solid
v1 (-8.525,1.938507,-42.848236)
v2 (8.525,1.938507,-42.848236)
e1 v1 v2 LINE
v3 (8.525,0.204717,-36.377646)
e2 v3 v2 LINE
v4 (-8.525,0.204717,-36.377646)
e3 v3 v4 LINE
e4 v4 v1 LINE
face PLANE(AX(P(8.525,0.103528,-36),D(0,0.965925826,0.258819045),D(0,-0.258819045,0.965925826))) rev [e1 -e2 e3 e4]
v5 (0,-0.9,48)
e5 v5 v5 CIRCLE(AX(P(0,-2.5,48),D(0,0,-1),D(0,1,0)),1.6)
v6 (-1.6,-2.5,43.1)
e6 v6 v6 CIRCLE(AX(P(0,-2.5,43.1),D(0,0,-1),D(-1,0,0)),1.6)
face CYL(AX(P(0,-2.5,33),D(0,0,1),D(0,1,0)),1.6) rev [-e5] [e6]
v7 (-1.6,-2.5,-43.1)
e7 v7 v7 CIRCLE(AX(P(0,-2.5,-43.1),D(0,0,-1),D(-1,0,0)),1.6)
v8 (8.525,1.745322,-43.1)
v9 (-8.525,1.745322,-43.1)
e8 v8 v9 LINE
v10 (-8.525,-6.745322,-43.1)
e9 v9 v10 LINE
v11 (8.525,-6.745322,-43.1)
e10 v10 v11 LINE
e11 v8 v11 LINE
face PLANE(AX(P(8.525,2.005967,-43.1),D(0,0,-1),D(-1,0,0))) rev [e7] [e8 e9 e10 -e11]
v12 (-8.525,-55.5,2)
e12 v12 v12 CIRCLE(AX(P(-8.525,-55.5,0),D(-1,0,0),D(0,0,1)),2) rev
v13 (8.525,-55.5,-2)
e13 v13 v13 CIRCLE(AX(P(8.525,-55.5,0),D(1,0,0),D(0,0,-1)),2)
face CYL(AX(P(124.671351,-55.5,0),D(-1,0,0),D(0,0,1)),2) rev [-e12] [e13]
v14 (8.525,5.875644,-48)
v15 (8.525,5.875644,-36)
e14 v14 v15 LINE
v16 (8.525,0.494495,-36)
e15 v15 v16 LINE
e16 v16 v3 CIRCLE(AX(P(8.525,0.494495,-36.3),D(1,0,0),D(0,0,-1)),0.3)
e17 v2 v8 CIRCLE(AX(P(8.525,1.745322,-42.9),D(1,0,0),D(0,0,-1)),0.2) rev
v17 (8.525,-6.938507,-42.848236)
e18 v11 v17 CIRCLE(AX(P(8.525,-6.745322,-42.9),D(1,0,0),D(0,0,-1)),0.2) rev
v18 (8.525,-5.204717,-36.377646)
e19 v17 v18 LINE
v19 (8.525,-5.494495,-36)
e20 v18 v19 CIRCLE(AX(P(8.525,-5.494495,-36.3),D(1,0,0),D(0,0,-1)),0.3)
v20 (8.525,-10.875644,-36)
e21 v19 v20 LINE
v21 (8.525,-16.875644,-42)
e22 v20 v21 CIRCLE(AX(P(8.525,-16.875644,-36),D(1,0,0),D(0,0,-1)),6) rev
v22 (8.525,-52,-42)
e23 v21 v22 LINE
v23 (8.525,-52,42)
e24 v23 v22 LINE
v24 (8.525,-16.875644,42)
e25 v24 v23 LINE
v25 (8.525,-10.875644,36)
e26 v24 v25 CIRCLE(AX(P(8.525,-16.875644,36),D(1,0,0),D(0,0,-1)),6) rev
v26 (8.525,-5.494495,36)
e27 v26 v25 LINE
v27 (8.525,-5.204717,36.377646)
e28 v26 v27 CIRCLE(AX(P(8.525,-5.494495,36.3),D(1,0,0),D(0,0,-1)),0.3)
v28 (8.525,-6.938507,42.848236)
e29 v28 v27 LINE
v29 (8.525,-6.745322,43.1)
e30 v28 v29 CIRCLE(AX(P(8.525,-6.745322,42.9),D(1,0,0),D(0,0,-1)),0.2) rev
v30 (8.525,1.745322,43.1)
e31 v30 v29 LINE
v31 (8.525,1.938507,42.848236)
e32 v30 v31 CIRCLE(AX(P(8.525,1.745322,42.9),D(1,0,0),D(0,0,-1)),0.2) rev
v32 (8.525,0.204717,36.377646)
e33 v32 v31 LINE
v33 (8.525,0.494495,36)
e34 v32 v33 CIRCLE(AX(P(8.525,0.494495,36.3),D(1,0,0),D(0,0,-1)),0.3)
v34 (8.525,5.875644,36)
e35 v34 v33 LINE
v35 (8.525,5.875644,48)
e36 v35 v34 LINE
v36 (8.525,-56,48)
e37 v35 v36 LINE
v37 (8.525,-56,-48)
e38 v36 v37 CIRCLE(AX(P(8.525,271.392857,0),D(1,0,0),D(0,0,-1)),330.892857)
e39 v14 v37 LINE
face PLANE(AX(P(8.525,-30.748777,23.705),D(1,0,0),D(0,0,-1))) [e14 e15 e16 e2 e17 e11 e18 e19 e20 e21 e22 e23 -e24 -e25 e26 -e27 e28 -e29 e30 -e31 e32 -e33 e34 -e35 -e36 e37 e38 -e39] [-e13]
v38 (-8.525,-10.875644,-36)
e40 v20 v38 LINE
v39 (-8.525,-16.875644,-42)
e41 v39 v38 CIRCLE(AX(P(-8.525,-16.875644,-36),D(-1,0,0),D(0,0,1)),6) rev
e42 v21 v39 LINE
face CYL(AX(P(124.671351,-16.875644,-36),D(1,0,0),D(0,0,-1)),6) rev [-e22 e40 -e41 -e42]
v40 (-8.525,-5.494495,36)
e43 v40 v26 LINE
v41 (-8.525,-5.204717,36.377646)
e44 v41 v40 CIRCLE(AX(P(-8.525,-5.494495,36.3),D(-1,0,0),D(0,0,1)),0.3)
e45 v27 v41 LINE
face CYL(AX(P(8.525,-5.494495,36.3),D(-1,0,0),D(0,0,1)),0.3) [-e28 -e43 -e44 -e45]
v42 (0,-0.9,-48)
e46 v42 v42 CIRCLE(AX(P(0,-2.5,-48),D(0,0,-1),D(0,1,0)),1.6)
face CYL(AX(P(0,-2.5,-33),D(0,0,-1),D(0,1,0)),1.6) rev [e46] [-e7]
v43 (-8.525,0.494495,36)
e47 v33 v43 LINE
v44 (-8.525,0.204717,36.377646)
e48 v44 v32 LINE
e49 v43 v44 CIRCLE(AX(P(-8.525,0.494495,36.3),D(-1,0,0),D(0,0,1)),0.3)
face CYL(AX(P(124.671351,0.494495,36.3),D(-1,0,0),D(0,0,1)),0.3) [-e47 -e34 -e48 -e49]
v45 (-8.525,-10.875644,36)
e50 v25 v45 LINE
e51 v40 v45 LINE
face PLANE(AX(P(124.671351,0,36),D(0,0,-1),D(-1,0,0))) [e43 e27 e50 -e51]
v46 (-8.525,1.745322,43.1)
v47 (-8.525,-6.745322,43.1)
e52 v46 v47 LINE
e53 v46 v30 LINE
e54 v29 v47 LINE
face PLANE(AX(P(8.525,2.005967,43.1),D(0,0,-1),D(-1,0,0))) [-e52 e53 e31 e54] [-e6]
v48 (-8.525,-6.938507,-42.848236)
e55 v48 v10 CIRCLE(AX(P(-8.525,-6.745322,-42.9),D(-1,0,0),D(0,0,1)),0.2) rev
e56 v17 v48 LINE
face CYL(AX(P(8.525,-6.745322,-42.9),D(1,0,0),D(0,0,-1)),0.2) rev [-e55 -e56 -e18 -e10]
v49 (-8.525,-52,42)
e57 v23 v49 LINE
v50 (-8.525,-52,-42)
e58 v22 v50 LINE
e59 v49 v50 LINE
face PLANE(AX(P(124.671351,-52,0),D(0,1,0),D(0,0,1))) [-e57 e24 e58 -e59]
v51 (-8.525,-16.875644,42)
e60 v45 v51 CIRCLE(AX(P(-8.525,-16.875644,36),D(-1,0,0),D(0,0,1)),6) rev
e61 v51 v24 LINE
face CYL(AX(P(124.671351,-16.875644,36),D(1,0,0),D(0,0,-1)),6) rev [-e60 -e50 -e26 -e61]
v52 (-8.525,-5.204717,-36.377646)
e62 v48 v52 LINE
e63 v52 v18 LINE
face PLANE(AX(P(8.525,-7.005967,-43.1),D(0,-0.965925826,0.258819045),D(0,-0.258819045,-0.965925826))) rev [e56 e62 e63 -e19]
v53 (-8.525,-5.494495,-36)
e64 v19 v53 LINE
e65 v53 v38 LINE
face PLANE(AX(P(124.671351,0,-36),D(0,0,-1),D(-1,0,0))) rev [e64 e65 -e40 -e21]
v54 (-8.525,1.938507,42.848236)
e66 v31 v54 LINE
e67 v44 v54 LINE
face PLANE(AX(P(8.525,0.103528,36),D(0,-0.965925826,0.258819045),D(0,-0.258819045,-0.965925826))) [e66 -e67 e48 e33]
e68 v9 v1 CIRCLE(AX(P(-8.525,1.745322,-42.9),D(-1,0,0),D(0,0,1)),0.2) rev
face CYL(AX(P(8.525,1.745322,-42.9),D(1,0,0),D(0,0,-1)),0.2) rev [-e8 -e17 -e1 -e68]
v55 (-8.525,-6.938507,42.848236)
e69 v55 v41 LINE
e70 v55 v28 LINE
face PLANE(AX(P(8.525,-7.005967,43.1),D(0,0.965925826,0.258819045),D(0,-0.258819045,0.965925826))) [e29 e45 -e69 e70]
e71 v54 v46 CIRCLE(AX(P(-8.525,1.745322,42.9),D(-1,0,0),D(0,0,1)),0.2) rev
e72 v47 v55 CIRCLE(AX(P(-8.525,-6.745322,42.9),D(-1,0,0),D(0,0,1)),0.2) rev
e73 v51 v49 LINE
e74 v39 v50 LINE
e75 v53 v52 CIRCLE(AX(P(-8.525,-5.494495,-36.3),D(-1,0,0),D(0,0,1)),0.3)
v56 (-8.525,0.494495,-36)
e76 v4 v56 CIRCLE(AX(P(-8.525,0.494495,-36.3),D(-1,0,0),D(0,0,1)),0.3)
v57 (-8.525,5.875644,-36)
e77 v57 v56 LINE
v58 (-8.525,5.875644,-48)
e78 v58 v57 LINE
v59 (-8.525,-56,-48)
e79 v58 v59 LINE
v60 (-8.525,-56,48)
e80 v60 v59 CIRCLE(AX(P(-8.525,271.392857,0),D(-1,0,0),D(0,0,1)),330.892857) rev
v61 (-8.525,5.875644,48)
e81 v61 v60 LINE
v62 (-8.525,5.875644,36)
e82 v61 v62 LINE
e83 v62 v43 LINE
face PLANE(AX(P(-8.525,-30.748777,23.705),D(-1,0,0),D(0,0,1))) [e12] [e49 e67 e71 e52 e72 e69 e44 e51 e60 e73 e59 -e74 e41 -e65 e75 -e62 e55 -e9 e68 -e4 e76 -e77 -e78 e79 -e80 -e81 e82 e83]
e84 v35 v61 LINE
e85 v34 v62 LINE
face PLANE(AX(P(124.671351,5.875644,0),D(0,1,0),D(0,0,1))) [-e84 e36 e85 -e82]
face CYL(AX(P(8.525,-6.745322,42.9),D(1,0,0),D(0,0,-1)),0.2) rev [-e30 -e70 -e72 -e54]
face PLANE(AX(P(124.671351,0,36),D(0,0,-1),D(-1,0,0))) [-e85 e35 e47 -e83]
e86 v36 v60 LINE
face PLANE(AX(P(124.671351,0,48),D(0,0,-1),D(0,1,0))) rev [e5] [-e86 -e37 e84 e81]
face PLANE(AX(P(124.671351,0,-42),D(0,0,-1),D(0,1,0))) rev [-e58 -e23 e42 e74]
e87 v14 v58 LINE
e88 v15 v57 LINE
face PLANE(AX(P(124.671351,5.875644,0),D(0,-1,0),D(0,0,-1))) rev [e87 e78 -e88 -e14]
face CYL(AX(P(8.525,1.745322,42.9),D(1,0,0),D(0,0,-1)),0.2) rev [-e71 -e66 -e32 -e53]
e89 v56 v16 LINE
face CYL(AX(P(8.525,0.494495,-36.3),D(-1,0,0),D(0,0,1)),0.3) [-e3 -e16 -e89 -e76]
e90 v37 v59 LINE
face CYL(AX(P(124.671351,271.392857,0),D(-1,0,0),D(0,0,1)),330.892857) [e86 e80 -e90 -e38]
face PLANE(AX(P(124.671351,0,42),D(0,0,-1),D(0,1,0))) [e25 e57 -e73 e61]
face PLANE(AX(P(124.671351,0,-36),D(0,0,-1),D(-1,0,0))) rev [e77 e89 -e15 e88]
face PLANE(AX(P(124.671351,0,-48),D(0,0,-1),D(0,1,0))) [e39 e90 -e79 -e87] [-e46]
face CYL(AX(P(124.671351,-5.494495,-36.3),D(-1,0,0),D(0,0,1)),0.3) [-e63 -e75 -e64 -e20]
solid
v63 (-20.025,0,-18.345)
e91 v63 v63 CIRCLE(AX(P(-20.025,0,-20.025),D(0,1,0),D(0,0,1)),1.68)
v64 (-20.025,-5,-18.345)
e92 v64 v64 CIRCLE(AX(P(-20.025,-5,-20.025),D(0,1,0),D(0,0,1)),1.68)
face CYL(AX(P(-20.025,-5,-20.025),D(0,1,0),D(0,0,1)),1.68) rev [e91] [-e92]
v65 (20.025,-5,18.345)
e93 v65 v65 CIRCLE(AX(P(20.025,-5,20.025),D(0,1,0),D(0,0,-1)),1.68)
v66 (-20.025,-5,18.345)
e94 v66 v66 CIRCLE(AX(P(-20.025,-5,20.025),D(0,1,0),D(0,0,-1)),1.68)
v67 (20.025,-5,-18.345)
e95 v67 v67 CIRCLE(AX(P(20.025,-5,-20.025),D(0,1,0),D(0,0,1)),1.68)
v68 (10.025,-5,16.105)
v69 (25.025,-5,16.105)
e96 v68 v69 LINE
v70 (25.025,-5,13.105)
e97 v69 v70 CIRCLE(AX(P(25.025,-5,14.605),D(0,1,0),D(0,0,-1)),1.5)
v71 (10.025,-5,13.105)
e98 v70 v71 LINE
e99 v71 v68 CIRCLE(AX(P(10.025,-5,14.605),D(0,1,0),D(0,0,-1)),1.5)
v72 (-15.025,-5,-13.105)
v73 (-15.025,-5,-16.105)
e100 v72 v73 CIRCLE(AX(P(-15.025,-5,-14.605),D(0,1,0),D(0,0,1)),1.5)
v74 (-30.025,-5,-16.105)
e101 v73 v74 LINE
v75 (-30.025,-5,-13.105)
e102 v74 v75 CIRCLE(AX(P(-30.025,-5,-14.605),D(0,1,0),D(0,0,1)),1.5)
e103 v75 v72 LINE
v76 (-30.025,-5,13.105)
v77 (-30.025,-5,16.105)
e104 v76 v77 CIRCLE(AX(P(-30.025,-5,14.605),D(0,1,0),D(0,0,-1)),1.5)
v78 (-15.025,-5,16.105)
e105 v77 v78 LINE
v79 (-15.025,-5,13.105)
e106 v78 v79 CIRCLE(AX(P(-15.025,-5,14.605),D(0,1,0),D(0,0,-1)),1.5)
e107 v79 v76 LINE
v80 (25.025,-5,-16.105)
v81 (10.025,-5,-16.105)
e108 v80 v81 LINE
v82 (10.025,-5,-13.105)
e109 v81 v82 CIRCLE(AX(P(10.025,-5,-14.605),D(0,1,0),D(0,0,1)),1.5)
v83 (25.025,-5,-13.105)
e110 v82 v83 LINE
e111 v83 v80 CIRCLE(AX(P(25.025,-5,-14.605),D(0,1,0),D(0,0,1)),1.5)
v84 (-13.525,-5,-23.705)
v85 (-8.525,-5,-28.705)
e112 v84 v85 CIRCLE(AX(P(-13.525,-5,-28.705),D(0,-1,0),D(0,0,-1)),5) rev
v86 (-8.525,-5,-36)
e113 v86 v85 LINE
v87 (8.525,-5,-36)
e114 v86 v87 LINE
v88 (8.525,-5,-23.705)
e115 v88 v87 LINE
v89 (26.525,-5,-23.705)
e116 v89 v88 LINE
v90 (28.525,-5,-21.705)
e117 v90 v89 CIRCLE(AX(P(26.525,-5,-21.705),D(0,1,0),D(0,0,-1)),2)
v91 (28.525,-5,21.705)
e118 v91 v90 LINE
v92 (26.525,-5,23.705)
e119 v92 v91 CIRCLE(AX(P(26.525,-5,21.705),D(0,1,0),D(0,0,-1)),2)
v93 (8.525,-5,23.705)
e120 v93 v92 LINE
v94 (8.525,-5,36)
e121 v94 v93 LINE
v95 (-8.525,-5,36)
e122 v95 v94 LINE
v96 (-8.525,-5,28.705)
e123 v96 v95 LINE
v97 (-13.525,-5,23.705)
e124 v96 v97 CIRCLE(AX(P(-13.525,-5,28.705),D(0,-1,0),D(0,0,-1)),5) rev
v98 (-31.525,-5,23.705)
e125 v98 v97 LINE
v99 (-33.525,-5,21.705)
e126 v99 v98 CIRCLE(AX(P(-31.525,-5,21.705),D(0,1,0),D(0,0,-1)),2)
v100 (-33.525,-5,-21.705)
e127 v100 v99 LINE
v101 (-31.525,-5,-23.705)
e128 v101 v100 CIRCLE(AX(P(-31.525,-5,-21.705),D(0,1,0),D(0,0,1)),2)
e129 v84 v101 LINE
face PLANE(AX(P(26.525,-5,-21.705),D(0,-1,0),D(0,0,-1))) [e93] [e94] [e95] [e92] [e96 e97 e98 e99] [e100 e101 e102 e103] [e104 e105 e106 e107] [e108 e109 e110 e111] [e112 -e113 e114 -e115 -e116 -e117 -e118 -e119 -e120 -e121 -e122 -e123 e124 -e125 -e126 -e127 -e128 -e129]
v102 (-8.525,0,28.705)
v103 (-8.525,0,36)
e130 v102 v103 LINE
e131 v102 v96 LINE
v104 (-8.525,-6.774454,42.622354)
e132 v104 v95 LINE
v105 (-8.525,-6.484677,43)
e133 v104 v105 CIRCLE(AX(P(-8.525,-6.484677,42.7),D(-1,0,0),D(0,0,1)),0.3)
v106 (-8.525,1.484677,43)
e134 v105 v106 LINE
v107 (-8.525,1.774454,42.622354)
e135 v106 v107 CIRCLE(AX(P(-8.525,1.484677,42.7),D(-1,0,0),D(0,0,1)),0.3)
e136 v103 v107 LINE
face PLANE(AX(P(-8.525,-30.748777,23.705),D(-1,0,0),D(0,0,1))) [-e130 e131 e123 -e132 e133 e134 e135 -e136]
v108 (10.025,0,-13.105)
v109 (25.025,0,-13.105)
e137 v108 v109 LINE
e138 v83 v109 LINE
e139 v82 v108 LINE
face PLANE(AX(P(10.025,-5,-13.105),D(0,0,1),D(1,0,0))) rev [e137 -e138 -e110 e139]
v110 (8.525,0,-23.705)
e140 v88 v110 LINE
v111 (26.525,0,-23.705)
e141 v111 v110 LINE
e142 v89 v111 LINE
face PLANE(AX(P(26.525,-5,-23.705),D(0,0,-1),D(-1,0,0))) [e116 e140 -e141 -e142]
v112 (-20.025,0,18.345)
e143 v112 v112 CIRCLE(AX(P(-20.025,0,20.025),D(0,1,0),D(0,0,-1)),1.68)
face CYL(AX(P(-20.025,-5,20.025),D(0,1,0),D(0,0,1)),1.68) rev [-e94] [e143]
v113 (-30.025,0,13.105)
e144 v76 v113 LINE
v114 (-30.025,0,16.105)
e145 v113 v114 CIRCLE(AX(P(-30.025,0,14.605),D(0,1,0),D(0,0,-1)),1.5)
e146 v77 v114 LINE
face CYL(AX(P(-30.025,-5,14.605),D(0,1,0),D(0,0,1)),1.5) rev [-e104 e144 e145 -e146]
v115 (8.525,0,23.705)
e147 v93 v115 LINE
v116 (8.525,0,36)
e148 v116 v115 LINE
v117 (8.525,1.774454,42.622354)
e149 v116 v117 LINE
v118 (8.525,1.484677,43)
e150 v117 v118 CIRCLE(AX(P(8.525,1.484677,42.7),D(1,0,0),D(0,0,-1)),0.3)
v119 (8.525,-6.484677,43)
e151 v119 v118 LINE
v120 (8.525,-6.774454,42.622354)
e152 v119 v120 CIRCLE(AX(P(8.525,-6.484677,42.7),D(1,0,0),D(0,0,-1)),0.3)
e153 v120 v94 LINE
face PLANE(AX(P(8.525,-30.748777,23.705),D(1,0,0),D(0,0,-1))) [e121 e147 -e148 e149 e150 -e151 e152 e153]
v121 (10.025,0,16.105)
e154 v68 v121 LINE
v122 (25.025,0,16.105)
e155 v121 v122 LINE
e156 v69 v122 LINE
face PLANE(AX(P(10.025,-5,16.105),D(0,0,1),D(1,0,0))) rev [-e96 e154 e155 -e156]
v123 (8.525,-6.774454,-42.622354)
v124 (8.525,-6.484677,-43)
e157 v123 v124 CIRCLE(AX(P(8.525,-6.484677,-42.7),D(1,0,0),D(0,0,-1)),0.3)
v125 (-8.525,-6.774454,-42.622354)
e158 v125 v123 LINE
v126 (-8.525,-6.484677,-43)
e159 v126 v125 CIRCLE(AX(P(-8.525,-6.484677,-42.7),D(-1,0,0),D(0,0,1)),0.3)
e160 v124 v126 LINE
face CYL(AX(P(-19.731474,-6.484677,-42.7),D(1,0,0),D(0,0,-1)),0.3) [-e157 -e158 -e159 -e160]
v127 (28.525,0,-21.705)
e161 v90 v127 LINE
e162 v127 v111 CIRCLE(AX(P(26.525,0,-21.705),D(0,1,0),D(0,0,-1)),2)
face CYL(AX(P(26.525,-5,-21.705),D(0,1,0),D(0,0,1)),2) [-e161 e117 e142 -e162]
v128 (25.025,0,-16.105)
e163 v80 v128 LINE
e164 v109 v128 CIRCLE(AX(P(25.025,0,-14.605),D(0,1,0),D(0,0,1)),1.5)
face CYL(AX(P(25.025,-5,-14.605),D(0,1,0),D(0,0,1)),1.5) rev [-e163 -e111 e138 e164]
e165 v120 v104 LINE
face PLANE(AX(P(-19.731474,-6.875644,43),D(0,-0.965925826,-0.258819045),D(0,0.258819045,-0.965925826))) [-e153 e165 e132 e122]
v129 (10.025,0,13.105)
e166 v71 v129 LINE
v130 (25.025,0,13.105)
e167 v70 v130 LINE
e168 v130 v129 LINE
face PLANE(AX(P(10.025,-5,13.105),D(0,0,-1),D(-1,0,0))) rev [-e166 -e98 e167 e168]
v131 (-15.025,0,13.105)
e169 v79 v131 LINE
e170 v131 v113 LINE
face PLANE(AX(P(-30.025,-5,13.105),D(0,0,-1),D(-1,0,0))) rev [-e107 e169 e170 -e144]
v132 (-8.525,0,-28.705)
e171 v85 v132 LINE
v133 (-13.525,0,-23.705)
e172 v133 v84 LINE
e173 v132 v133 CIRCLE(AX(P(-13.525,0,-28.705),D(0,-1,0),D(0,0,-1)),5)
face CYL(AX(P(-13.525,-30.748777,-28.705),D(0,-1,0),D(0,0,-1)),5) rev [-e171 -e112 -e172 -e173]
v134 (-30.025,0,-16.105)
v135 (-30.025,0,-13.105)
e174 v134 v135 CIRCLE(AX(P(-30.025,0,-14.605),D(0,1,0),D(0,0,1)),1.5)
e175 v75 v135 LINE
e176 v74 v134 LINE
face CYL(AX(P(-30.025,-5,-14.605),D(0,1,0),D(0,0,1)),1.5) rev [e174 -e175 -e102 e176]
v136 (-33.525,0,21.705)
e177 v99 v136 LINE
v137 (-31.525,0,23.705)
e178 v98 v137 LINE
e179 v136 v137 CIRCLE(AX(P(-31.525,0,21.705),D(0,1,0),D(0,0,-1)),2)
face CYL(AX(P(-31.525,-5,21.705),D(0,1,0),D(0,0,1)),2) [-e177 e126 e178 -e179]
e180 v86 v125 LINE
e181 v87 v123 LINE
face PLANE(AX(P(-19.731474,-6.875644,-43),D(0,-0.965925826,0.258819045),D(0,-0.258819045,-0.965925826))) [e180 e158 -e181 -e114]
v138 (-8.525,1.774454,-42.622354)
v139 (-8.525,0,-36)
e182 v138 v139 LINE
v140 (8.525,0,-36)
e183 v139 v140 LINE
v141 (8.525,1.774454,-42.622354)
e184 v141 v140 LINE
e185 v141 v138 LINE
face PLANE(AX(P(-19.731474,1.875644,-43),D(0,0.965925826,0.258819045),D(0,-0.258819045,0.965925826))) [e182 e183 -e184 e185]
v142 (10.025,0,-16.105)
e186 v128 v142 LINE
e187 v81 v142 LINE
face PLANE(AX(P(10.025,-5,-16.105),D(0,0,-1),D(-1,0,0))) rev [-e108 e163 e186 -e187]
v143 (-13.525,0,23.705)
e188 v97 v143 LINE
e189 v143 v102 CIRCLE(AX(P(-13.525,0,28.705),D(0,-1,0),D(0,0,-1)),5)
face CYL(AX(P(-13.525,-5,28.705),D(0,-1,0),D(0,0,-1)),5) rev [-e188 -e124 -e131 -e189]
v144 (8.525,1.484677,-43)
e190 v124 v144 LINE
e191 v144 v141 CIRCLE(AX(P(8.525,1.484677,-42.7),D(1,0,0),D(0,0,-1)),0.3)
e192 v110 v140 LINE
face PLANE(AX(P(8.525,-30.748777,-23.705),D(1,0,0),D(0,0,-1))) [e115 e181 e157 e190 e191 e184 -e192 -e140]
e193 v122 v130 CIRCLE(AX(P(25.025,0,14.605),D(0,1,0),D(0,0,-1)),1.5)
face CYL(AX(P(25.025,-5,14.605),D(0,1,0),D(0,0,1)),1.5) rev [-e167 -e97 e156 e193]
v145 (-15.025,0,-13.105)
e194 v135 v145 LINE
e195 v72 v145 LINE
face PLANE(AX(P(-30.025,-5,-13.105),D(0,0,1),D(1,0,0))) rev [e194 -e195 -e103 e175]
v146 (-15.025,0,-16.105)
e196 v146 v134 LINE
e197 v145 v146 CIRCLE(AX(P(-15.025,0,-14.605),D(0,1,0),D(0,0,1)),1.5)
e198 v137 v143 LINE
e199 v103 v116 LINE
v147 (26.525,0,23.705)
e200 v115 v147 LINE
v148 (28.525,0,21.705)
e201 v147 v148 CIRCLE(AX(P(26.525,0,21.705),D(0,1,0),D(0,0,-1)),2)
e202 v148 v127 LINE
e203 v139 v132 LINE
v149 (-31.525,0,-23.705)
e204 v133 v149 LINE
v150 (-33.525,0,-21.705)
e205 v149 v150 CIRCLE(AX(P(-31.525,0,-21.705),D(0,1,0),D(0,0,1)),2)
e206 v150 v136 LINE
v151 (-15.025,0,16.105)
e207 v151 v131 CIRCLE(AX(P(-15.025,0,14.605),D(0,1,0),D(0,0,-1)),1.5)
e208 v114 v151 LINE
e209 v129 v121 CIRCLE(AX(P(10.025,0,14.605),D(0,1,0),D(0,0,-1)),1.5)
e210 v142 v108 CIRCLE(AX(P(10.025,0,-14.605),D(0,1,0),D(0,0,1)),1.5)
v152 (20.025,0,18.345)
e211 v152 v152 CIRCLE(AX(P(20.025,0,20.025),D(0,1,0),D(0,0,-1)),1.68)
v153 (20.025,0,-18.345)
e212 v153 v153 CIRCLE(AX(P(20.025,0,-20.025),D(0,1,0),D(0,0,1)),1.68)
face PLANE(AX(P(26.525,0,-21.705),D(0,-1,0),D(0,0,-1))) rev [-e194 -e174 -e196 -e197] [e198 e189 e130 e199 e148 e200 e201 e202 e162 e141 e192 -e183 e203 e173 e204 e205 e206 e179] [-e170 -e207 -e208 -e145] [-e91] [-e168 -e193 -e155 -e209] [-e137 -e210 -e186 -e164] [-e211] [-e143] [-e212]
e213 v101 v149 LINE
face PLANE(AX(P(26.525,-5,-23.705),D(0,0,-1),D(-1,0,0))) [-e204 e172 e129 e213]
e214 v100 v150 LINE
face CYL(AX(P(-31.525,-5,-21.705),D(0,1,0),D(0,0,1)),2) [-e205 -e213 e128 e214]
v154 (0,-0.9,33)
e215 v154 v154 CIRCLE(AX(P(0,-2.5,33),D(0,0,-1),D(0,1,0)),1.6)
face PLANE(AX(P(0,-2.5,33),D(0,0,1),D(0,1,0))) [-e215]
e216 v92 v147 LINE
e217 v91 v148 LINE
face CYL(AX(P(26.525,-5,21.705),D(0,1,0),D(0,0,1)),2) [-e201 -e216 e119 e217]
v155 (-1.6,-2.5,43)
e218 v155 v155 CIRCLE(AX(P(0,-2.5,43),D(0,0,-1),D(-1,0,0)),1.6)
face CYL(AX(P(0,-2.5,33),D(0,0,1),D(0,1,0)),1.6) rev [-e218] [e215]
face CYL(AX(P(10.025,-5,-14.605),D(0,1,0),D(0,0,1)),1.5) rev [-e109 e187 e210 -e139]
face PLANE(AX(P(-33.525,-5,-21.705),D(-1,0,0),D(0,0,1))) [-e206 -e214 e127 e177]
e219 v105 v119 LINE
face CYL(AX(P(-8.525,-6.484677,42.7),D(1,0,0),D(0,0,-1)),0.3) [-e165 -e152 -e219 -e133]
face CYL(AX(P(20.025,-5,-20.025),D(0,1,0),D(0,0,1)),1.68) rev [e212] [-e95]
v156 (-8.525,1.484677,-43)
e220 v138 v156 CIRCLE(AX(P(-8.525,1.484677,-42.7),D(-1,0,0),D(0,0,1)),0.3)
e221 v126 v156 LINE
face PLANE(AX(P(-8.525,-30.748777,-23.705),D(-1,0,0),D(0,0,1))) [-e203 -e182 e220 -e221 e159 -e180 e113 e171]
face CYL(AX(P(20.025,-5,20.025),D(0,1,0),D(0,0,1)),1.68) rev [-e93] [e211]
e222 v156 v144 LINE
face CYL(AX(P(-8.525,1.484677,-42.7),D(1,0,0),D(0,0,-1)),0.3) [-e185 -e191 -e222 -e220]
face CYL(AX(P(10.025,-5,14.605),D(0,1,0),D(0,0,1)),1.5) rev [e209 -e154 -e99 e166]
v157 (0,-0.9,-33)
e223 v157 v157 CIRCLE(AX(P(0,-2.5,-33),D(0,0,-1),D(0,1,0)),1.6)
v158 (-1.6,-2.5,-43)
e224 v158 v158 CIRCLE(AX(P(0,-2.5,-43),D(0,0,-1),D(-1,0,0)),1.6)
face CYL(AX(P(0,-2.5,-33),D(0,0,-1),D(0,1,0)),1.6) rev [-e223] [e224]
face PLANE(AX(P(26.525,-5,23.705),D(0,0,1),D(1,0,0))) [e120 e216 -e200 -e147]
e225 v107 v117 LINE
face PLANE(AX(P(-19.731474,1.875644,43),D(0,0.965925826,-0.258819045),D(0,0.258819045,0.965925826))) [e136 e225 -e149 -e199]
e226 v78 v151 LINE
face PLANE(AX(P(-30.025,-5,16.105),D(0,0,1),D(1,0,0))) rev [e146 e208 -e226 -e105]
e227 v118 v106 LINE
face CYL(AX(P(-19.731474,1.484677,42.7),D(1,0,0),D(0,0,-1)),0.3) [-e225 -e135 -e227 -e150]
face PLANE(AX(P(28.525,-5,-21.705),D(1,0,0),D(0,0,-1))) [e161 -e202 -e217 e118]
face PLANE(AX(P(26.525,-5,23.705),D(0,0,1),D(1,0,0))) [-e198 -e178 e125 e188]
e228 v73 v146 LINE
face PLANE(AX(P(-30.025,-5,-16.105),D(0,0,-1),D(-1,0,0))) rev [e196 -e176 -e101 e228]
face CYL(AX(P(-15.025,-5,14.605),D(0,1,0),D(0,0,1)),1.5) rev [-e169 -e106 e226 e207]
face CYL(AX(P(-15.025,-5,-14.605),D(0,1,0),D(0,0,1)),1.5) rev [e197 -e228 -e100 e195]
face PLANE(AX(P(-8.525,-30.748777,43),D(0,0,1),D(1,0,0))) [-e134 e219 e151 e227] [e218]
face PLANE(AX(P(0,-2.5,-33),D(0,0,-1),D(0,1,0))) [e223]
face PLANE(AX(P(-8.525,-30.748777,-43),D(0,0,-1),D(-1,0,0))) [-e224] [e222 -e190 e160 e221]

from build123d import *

# Parameters (mm, degrees)
SKETCH1_R                       = 1.6800000000000102
BOSS_EXTRUDE1_DEPTH             = 5
SKETCH3_W                       = 17.05000000000101
SKETCH3_H                       = 19.294999999999526
BOSS_EXTRUDE2_DEPTH             = 5
BOSS_EXTRUDE3_DEPTH             = 17.05
FILLET1_R                       = 5
BOSS_EXTRUDE4_REACH             = 56.956
SKETCH7_R                       = 2.000000000000002
BOSS_EXTRUDE4_DIRECTION_2_REACH = 56.956
CUT_EXTRUDE1_DEPTH              = 88.24936962523023
CUT_EXTRUDE2_DEPTH              = 114.2388449815347
FILLET2_R                       = 0.3
FILLET3_R                       = 0.3
FILLET4_R                       = 0.2
FILLET5_R                       = 6
SKETCH11_R                      = 1.6000000000000003
CUT_EXTRUDE3_DEPTH              = 15


with BuildPart() as part:
    # Sketch1 → Boss-Extrude1 (new body)
    with BuildSketch(Plane(origin=(0, 0, 0), x_dir=(1, 0, 0), z_dir=(0, 1, 0))):
        with BuildLine():
            Line((26.52500000000002, 23.705000000000474), (-31.52499999999999, 23.70499999999999))
            ThreePointArc((-31.52499999999999, 23.70499999999999), (-32.93921356237309, 23.119213562373083), (-33.52499999999999, 21.704999999999988))
            Line((-33.52499999999999, 21.704999999999988), (-33.52499999999999, -21.704999999999988))
            ThreePointArc((-33.52499999999999, -21.704999999999988), (-32.93921356237309, -23.119213562373083), (-31.52499999999999, -23.70499999999999))
            Line((-31.52499999999999, -23.70499999999999), (26.52500000000002, -23.705000000000474))
            ThreePointArc((26.52500000000002, -23.705000000000474), (27.93921356237312, -23.11921356237357), (28.525000000000023, -21.705000000000474))
            Line((28.525000000000023, -21.705000000000474), (28.525000000000023, 21.705000000000474))
            ThreePointArc((28.525000000000023, 21.705000000000474), (27.939213562373116, 23.11921356237357), (26.52500000000002, 23.705000000000474))
        make_face()
        with Locations(Location((-20.025000000000404, 20.025000000000126, 0), (0, 0, 270))):
            Circle(SKETCH1_R, mode=Mode.SUBTRACT)
        with Locations(Location((20.025000000000404, -20.025000000000237, 0), (0, 0, 90))):
            Circle(SKETCH1_R, mode=Mode.SUBTRACT)
        with Locations(Location((20.025000000000183, 20.025000000000347, 0), (0, 0, 270))):
            Circle(SKETCH1_R, mode=Mode.SUBTRACT)
        with Locations(Location((-20.025000000000126, -20.02500000000057, 0), (0, 0, 90))):
            Circle(SKETCH1_R, mode=Mode.SUBTRACT)
        with BuildLine():
            Line((10.025000000000507, 16.10500000000037), (25.025000000000187, 16.10500000000037))
            ThreePointArc((25.025000000000187, 16.10500000000037), (26.525000000000297, 14.605000000000478), (25.025000000000187, 13.105000000000366))
            Line((25.025000000000187, 13.105000000000366), (10.025000000000507, 13.105000000000366))
            ThreePointArc((10.025000000000507, 13.105000000000366), (8.525000000000505, 14.605000000000368), (10.025000000000507, 16.10500000000037))
        make_face(mode=Mode.SUBTRACT)
        with BuildLine():
            Line((-30.025, 16.104999999999997), (-15.024999999999993, 16.104999999999997))
            ThreePointArc((-15.024999999999993, 16.104999999999997), (-13.524999999999993, 14.604999999999993), (-15.025000000000004, 13.104999999999995))
            Line((-15.025000000000004, 13.104999999999995), (-30.024999999999988, 13.104999999999995))
            ThreePointArc((-30.024999999999988, 13.104999999999995), (-31.525, 14.604999999999993), (-30.025, 16.104999999999997))
        make_face(mode=Mode.SUBTRACT)
        with BuildLine():
            Line((-30.024999999999988, -16.105), (-15.024999999999993, -16.104999999999997))
            ThreePointArc((-15.024999999999993, -16.104999999999997), (-13.52499999999999, -14.604999999999999), (-15.024999999999993, -13.104999999999992))
            Line((-15.024999999999993, -13.104999999999992), (-30.024999999999988, -13.104999999999995))
            ThreePointArc((-30.024999999999988, -13.104999999999995), (-31.525, -14.604999999999999), (-30.024999999999988, -16.105))
        make_face(mode=Mode.SUBTRACT)
        with BuildLine():
            Line((10.025000000000507, -16.10500000000037), (25.025000000000187, -16.10500000000037))
            ThreePointArc((25.025000000000187, -16.10500000000037), (26.525000000000077, -14.605000000000256), (25.025000000000187, -13.105000000000366))
            Line((25.025000000000187, -13.105000000000366), (10.025000000000507, -13.105000000000366))
            ThreePointArc((10.025000000000507, -13.105000000000366), (8.525000000000505, -14.605000000000368), (10.025000000000507, -16.10500000000037))
        make_face(mode=Mode.SUBTRACT)
    extrude(amount=-BOSS_EXTRUDE1_DEPTH)

    # Sketch3 → Boss-Extrude2 (add)
    with BuildSketch(Plane(origin=(0, 0, 0), x_dir=(1, 0, 0), z_dir=(0, 1, 0))):
        with Locations((0, 33.352500000000234)):
            Rectangle(SKETCH3_W, SKETCH3_H)
        with Locations((0, -33.352500000000234)):
            Rectangle(SKETCH3_W, SKETCH3_H)
    extrude(amount=-BOSS_EXTRUDE2_DEPTH)

    # Sketch6 → Boss-Extrude3 (add)
    with BuildSketch(Plane(origin=(8.525000000000505, 0, 0), x_dir=(0, 0, -1), z_dir=(1, 0, 0))):
        Polygon((42.99999999999999, 1.8756443470178361), (42.99999999999999, -6.8756443470178334), (36, -4.999999999999998), (36, 0), align=None)
        Polygon((-42.99999999999999, -6.875644347017854), (-36, -4.999999999999998), (-36, -1.821e-14), (-42.99999999999999, 1.8756443470178361), align=None)
    extrude(amount=-BOSS_EXTRUDE3_DEPTH)

    # Fillet1
    fillet1_edges = [part.edges().sort_by_distance(p)[0] for p in [
        (-8.525000000000505, -2.5, -23.705000000000474),
        (-8.525000000000505, -2.5, 23.705000000000474),
    ]]
    fillet(fillet1_edges, radius=FILLET1_R)


with BuildPart() as body_2:

    # Boss-Extrude4: up to this face of the body (flat: up to its plane)
    boss_extrude4_end = Plane(part.part.faces().sort_by_distance((8.525, -2.5, 34.228663099))[0])
    # Sketch7 → Boss-Extrude4 (new, up to the picked face)
    with BuildSketch(Plane(origin=(0, 0, 0), x_dir=(0, 0, -1), z_dir=(1, 0, 0)), mode=Mode.PRIVATE) as boss_extrude4_sk1:
        with BuildLine():
            Line((-47.999999999999986, 5.875644347017835), (-35.99999999999999, 5.875644347017835))
            Line((-35.99999999999999, 5.875644347017835), (-35.99999999999999, -10.875644347017854))
            Line((-35.99999999999999, -10.875644347017854), (-41.999999999999986, -10.875644347017854))
            Line((-41.999999999999986, -10.875644347017854), (-41.99999999999998, -52))
            Line((-41.99999999999998, -52), (41.99999999999998, -52))
            Line((41.99999999999998, -52), (41.999999999999986, -10.875644347017854))
            Line((41.999999999999986, -10.875644347017854), (35.99999999999999, -10.875644347017854))
            Line((35.99999999999999, -10.875644347017854), (35.99999999999999, 5.875644347017835))
            Line((35.99999999999999, 5.875644347017835), (47.999999999999986, 5.875644347017835))
            Line((47.999999999999986, 5.875644347017835), (47.99999999999998, -52))
            Line((47.99999999999998, -52), (47.999999999999986, -55.99999999999999))
            ThreePointArc((47.999999999999986, -55.99999999999999), (2.243e-14, -59.5), (-47.999999999999986, -55.99999999999999))
            Line((-47.999999999999986, -55.99999999999999), (-47.99999999999998, -52))
            Line((-47.99999999999998, -52), (-47.999999999999986, 5.875644347017835))
        make_face()
        with Locations(Location((0, -55.5, 0), (0, 0, 180))):
            Circle(SKETCH7_R, mode=Mode.SUBTRACT)
    boss_extrude4_tool1 = split(extrude(boss_extrude4_sk1.sketch, amount=BOSS_EXTRUDE4_REACH, mode=Mode.PRIVATE), bisect_by=boss_extrude4_end, keep=Keep.BOTH, mode=Mode.PRIVATE)
    add(boss_extrude4_tool1.solids().sort_by(Axis((0, 4.714181, 42), (1, 0, 0)))[0])


    # Boss-Extrude4 direction 2: up to this face of the body (flat: up to its plane)
    boss_extrude4_direction_2_end = Plane(part.part.faces().sort_by_distance((-8.525, -2.5, 36.599595529))[0])
    # Sketch7 → Boss-Extrude4 direction 2 (add, up to the picked face)
    with BuildSketch(Plane(origin=(0, 0, 0), x_dir=(0, 0, -1), z_dir=(1, 0, 0)), mode=Mode.PRIVATE) as boss_extrude4_direction_2_sk1:
        with BuildLine():
            Line((-47.999999999999986, 5.875644347017835), (-35.99999999999999, 5.875644347017835))
            Line((-35.99999999999999, 5.875644347017835), (-35.99999999999999, -10.875644347017854))
            Line((-35.99999999999999, -10.875644347017854), (-41.999999999999986, -10.875644347017854))
            Line((-41.999999999999986, -10.875644347017854), (-41.99999999999998, -52))
            Line((-41.99999999999998, -52), (41.99999999999998, -52))
            Line((41.99999999999998, -52), (41.999999999999986, -10.875644347017854))
            Line((41.999999999999986, -10.875644347017854), (35.99999999999999, -10.875644347017854))
            Line((35.99999999999999, -10.875644347017854), (35.99999999999999, 5.875644347017835))
            Line((35.99999999999999, 5.875644347017835), (47.999999999999986, 5.875644347017835))
            Line((47.999999999999986, 5.875644347017835), (47.99999999999998, -52))
            Line((47.99999999999998, -52), (47.999999999999986, -55.99999999999999))
            ThreePointArc((47.999999999999986, -55.99999999999999), (2.243e-14, -59.5), (-47.999999999999986, -55.99999999999999))
            Line((-47.999999999999986, -55.99999999999999), (-47.99999999999998, -52))
            Line((-47.99999999999998, -52), (-47.999999999999986, 5.875644347017835))
        make_face()
        with Locations(Location((0, -55.5, 0), (0, 0, 180))):
            Circle(SKETCH7_R, mode=Mode.SUBTRACT)
    boss_extrude4_direction_2_tool1 = split(extrude(boss_extrude4_direction_2_sk1.sketch, amount=-BOSS_EXTRUDE4_DIRECTION_2_REACH, mode=Mode.PRIVATE), bisect_by=boss_extrude4_direction_2_end, keep=Keep.BOTH, mode=Mode.PRIVATE)
    add(boss_extrude4_direction_2_tool1.solids().sort_by(Axis((0, 4.714181, 42), (-1, 0, 0)))[0])

    # Sketch6<2> → Cut-Extrude1 (cut, through all)
    with BuildSketch(Plane(origin=(8.525000000000505, 0, 0), x_dir=(0, 0, -1), z_dir=(1, 0, 0))):
        Polygon((42.99999999999999, 1.8756443470178361), (42.99999999999999, -6.8756443470178334), (36, -4.999999999999998), (36, 0), align=None)
        Polygon((-42.99999999999999, -6.875644347017854), (-36, -4.999999999999998), (-36, -1.821e-14), (-42.99999999999999, 1.8756443470178361), align=None)
    extrude(amount=-CUT_EXTRUDE1_DEPTH, mode=Mode.SUBTRACT)

    # 3DSketch1 → Cut-Extrude2 (cut, through all)
    with BuildSketch(Plane(origin=(8.525000000000505, -7.005966884301975, 43.099999999999994), x_dir=(0, 0.10398008692504432, -0.9945793791965829), z_dir=(1, 0, 0))):
        Polygon((0, 0), (7.259329392571174, 1.1538682472292239), (7.800759448642486, 6.332698011373968), (0.9370616566221789, 8.963083492938818), align=None)
        Polygon((79.41047475079642, -1.1538682472292203), (78.8690446947251, -6.332698011373965), (85.73274248674544, -8.963083492938818), (86.66980414336761, 0), align=None)
    extrude(amount=-CUT_EXTRUDE2_DEPTH, mode=Mode.SUBTRACT)

    # Fillet3
    fillet3_edges = [body_2.edges().sort_by_distance(p)[0] for p in [
        (0, -5.103527618041005, -35.99999999999997),
        (0, 0.10352761804098698, -35.999999999999986),
        (0, -5.103527618041004, 35.99999999999999),
        (0, 0.10352761804098787, 35.99999999999999),
    ]]
    fillet(fillet3_edges, radius=FILLET3_R)

    # Fillet4
    fillet4_edges = [body_2.edges().sort_by_distance(p)[0] for p in [
        (0, 2.005966884301957, -43.099999999999994),
        (0, -7.005966884301975, -43.10000000000001),
        (0, -7.005966884301975, 43.099999999999994),
        (0, 2.005966884301955, 43.099999999999994),
    ]]
    fillet(fillet4_edges, radius=FILLET4_R)

    # Fillet5
    fillet5_edges = [body_2.edges().sort_by_distance(p)[0] for p in [
        (0, -10.875644347017854, -41.999999999999986),
        (0, -10.875644347017854, 41.999999999999986),
    ]]
    fillet(fillet5_edges, radius=FILLET5_R - 0.0001)  # a hair under: the kernel refuses the full size


with BuildPart() as part_1:
    add(part.part)

    # Fillet2
    fillet2_edges = [part_1.edges().sort_by_distance(p)[0] for p in [
        (5.0449e-13, 1.8756443470178361, -42.99999999999999),
        (5.0449e-13, -6.8756443470178334, -42.99999999999999),
        (5.0449e-13, 1.8756443470178361, 42.99999999999999),
        (5.0449e-13, -6.875644347017854, 42.99999999999999),
    ]]
    fillet(fillet2_edges, radius=FILLET2_R)


with BuildPart() as cut_extrude3_tool:
    # Sketch11 → Cut-Extrude3 (new body)
    with BuildSketch(Plane(origin=(0, 8.327e-14, -47.99999999999989), x_dir=(-1, 0, 0), z_dir=(0, 1.73e-15, -1))):
        with Locations(Location((0, -2.500000000000044, 0), (0, 0, 90))):
            Circle(SKETCH11_R)
    cut_extrude3 = extrude(amount=-CUT_EXTRUDE3_DEPTH)


with BuildPart() as part_2:
    add(part_1.part)

    # Cut-Extrude3: cut by cut_extrude3_tool
    add(cut_extrude3_tool.part, mode=Mode.SUBTRACT)


with BuildPart() as body_2_1:
    add(body_2.part)

    # Cut-Extrude3: cut by cut_extrude3_tool
    add(cut_extrude3_tool.part, mode=Mode.SUBTRACT)


with BuildPart() as mirror1_tool:
    # Mirror1: Cut-Extrude3 across plane
    add(cut_extrude3.mirror(Plane.XY))


with BuildPart() as part_3:
    add(part_2.part)

    # Mirror1: cut by mirror1_tool
    add(mirror1_tool.part, mode=Mode.SUBTRACT)


with BuildPart() as body_2_2:
    add(body_2_1.part)

    # Mirror1: cut by mirror1_tool
    add(mirror1_tool.part, mode=Mode.SUBTRACT)


solid = Compound([part_3.part, body_2_2.part])
